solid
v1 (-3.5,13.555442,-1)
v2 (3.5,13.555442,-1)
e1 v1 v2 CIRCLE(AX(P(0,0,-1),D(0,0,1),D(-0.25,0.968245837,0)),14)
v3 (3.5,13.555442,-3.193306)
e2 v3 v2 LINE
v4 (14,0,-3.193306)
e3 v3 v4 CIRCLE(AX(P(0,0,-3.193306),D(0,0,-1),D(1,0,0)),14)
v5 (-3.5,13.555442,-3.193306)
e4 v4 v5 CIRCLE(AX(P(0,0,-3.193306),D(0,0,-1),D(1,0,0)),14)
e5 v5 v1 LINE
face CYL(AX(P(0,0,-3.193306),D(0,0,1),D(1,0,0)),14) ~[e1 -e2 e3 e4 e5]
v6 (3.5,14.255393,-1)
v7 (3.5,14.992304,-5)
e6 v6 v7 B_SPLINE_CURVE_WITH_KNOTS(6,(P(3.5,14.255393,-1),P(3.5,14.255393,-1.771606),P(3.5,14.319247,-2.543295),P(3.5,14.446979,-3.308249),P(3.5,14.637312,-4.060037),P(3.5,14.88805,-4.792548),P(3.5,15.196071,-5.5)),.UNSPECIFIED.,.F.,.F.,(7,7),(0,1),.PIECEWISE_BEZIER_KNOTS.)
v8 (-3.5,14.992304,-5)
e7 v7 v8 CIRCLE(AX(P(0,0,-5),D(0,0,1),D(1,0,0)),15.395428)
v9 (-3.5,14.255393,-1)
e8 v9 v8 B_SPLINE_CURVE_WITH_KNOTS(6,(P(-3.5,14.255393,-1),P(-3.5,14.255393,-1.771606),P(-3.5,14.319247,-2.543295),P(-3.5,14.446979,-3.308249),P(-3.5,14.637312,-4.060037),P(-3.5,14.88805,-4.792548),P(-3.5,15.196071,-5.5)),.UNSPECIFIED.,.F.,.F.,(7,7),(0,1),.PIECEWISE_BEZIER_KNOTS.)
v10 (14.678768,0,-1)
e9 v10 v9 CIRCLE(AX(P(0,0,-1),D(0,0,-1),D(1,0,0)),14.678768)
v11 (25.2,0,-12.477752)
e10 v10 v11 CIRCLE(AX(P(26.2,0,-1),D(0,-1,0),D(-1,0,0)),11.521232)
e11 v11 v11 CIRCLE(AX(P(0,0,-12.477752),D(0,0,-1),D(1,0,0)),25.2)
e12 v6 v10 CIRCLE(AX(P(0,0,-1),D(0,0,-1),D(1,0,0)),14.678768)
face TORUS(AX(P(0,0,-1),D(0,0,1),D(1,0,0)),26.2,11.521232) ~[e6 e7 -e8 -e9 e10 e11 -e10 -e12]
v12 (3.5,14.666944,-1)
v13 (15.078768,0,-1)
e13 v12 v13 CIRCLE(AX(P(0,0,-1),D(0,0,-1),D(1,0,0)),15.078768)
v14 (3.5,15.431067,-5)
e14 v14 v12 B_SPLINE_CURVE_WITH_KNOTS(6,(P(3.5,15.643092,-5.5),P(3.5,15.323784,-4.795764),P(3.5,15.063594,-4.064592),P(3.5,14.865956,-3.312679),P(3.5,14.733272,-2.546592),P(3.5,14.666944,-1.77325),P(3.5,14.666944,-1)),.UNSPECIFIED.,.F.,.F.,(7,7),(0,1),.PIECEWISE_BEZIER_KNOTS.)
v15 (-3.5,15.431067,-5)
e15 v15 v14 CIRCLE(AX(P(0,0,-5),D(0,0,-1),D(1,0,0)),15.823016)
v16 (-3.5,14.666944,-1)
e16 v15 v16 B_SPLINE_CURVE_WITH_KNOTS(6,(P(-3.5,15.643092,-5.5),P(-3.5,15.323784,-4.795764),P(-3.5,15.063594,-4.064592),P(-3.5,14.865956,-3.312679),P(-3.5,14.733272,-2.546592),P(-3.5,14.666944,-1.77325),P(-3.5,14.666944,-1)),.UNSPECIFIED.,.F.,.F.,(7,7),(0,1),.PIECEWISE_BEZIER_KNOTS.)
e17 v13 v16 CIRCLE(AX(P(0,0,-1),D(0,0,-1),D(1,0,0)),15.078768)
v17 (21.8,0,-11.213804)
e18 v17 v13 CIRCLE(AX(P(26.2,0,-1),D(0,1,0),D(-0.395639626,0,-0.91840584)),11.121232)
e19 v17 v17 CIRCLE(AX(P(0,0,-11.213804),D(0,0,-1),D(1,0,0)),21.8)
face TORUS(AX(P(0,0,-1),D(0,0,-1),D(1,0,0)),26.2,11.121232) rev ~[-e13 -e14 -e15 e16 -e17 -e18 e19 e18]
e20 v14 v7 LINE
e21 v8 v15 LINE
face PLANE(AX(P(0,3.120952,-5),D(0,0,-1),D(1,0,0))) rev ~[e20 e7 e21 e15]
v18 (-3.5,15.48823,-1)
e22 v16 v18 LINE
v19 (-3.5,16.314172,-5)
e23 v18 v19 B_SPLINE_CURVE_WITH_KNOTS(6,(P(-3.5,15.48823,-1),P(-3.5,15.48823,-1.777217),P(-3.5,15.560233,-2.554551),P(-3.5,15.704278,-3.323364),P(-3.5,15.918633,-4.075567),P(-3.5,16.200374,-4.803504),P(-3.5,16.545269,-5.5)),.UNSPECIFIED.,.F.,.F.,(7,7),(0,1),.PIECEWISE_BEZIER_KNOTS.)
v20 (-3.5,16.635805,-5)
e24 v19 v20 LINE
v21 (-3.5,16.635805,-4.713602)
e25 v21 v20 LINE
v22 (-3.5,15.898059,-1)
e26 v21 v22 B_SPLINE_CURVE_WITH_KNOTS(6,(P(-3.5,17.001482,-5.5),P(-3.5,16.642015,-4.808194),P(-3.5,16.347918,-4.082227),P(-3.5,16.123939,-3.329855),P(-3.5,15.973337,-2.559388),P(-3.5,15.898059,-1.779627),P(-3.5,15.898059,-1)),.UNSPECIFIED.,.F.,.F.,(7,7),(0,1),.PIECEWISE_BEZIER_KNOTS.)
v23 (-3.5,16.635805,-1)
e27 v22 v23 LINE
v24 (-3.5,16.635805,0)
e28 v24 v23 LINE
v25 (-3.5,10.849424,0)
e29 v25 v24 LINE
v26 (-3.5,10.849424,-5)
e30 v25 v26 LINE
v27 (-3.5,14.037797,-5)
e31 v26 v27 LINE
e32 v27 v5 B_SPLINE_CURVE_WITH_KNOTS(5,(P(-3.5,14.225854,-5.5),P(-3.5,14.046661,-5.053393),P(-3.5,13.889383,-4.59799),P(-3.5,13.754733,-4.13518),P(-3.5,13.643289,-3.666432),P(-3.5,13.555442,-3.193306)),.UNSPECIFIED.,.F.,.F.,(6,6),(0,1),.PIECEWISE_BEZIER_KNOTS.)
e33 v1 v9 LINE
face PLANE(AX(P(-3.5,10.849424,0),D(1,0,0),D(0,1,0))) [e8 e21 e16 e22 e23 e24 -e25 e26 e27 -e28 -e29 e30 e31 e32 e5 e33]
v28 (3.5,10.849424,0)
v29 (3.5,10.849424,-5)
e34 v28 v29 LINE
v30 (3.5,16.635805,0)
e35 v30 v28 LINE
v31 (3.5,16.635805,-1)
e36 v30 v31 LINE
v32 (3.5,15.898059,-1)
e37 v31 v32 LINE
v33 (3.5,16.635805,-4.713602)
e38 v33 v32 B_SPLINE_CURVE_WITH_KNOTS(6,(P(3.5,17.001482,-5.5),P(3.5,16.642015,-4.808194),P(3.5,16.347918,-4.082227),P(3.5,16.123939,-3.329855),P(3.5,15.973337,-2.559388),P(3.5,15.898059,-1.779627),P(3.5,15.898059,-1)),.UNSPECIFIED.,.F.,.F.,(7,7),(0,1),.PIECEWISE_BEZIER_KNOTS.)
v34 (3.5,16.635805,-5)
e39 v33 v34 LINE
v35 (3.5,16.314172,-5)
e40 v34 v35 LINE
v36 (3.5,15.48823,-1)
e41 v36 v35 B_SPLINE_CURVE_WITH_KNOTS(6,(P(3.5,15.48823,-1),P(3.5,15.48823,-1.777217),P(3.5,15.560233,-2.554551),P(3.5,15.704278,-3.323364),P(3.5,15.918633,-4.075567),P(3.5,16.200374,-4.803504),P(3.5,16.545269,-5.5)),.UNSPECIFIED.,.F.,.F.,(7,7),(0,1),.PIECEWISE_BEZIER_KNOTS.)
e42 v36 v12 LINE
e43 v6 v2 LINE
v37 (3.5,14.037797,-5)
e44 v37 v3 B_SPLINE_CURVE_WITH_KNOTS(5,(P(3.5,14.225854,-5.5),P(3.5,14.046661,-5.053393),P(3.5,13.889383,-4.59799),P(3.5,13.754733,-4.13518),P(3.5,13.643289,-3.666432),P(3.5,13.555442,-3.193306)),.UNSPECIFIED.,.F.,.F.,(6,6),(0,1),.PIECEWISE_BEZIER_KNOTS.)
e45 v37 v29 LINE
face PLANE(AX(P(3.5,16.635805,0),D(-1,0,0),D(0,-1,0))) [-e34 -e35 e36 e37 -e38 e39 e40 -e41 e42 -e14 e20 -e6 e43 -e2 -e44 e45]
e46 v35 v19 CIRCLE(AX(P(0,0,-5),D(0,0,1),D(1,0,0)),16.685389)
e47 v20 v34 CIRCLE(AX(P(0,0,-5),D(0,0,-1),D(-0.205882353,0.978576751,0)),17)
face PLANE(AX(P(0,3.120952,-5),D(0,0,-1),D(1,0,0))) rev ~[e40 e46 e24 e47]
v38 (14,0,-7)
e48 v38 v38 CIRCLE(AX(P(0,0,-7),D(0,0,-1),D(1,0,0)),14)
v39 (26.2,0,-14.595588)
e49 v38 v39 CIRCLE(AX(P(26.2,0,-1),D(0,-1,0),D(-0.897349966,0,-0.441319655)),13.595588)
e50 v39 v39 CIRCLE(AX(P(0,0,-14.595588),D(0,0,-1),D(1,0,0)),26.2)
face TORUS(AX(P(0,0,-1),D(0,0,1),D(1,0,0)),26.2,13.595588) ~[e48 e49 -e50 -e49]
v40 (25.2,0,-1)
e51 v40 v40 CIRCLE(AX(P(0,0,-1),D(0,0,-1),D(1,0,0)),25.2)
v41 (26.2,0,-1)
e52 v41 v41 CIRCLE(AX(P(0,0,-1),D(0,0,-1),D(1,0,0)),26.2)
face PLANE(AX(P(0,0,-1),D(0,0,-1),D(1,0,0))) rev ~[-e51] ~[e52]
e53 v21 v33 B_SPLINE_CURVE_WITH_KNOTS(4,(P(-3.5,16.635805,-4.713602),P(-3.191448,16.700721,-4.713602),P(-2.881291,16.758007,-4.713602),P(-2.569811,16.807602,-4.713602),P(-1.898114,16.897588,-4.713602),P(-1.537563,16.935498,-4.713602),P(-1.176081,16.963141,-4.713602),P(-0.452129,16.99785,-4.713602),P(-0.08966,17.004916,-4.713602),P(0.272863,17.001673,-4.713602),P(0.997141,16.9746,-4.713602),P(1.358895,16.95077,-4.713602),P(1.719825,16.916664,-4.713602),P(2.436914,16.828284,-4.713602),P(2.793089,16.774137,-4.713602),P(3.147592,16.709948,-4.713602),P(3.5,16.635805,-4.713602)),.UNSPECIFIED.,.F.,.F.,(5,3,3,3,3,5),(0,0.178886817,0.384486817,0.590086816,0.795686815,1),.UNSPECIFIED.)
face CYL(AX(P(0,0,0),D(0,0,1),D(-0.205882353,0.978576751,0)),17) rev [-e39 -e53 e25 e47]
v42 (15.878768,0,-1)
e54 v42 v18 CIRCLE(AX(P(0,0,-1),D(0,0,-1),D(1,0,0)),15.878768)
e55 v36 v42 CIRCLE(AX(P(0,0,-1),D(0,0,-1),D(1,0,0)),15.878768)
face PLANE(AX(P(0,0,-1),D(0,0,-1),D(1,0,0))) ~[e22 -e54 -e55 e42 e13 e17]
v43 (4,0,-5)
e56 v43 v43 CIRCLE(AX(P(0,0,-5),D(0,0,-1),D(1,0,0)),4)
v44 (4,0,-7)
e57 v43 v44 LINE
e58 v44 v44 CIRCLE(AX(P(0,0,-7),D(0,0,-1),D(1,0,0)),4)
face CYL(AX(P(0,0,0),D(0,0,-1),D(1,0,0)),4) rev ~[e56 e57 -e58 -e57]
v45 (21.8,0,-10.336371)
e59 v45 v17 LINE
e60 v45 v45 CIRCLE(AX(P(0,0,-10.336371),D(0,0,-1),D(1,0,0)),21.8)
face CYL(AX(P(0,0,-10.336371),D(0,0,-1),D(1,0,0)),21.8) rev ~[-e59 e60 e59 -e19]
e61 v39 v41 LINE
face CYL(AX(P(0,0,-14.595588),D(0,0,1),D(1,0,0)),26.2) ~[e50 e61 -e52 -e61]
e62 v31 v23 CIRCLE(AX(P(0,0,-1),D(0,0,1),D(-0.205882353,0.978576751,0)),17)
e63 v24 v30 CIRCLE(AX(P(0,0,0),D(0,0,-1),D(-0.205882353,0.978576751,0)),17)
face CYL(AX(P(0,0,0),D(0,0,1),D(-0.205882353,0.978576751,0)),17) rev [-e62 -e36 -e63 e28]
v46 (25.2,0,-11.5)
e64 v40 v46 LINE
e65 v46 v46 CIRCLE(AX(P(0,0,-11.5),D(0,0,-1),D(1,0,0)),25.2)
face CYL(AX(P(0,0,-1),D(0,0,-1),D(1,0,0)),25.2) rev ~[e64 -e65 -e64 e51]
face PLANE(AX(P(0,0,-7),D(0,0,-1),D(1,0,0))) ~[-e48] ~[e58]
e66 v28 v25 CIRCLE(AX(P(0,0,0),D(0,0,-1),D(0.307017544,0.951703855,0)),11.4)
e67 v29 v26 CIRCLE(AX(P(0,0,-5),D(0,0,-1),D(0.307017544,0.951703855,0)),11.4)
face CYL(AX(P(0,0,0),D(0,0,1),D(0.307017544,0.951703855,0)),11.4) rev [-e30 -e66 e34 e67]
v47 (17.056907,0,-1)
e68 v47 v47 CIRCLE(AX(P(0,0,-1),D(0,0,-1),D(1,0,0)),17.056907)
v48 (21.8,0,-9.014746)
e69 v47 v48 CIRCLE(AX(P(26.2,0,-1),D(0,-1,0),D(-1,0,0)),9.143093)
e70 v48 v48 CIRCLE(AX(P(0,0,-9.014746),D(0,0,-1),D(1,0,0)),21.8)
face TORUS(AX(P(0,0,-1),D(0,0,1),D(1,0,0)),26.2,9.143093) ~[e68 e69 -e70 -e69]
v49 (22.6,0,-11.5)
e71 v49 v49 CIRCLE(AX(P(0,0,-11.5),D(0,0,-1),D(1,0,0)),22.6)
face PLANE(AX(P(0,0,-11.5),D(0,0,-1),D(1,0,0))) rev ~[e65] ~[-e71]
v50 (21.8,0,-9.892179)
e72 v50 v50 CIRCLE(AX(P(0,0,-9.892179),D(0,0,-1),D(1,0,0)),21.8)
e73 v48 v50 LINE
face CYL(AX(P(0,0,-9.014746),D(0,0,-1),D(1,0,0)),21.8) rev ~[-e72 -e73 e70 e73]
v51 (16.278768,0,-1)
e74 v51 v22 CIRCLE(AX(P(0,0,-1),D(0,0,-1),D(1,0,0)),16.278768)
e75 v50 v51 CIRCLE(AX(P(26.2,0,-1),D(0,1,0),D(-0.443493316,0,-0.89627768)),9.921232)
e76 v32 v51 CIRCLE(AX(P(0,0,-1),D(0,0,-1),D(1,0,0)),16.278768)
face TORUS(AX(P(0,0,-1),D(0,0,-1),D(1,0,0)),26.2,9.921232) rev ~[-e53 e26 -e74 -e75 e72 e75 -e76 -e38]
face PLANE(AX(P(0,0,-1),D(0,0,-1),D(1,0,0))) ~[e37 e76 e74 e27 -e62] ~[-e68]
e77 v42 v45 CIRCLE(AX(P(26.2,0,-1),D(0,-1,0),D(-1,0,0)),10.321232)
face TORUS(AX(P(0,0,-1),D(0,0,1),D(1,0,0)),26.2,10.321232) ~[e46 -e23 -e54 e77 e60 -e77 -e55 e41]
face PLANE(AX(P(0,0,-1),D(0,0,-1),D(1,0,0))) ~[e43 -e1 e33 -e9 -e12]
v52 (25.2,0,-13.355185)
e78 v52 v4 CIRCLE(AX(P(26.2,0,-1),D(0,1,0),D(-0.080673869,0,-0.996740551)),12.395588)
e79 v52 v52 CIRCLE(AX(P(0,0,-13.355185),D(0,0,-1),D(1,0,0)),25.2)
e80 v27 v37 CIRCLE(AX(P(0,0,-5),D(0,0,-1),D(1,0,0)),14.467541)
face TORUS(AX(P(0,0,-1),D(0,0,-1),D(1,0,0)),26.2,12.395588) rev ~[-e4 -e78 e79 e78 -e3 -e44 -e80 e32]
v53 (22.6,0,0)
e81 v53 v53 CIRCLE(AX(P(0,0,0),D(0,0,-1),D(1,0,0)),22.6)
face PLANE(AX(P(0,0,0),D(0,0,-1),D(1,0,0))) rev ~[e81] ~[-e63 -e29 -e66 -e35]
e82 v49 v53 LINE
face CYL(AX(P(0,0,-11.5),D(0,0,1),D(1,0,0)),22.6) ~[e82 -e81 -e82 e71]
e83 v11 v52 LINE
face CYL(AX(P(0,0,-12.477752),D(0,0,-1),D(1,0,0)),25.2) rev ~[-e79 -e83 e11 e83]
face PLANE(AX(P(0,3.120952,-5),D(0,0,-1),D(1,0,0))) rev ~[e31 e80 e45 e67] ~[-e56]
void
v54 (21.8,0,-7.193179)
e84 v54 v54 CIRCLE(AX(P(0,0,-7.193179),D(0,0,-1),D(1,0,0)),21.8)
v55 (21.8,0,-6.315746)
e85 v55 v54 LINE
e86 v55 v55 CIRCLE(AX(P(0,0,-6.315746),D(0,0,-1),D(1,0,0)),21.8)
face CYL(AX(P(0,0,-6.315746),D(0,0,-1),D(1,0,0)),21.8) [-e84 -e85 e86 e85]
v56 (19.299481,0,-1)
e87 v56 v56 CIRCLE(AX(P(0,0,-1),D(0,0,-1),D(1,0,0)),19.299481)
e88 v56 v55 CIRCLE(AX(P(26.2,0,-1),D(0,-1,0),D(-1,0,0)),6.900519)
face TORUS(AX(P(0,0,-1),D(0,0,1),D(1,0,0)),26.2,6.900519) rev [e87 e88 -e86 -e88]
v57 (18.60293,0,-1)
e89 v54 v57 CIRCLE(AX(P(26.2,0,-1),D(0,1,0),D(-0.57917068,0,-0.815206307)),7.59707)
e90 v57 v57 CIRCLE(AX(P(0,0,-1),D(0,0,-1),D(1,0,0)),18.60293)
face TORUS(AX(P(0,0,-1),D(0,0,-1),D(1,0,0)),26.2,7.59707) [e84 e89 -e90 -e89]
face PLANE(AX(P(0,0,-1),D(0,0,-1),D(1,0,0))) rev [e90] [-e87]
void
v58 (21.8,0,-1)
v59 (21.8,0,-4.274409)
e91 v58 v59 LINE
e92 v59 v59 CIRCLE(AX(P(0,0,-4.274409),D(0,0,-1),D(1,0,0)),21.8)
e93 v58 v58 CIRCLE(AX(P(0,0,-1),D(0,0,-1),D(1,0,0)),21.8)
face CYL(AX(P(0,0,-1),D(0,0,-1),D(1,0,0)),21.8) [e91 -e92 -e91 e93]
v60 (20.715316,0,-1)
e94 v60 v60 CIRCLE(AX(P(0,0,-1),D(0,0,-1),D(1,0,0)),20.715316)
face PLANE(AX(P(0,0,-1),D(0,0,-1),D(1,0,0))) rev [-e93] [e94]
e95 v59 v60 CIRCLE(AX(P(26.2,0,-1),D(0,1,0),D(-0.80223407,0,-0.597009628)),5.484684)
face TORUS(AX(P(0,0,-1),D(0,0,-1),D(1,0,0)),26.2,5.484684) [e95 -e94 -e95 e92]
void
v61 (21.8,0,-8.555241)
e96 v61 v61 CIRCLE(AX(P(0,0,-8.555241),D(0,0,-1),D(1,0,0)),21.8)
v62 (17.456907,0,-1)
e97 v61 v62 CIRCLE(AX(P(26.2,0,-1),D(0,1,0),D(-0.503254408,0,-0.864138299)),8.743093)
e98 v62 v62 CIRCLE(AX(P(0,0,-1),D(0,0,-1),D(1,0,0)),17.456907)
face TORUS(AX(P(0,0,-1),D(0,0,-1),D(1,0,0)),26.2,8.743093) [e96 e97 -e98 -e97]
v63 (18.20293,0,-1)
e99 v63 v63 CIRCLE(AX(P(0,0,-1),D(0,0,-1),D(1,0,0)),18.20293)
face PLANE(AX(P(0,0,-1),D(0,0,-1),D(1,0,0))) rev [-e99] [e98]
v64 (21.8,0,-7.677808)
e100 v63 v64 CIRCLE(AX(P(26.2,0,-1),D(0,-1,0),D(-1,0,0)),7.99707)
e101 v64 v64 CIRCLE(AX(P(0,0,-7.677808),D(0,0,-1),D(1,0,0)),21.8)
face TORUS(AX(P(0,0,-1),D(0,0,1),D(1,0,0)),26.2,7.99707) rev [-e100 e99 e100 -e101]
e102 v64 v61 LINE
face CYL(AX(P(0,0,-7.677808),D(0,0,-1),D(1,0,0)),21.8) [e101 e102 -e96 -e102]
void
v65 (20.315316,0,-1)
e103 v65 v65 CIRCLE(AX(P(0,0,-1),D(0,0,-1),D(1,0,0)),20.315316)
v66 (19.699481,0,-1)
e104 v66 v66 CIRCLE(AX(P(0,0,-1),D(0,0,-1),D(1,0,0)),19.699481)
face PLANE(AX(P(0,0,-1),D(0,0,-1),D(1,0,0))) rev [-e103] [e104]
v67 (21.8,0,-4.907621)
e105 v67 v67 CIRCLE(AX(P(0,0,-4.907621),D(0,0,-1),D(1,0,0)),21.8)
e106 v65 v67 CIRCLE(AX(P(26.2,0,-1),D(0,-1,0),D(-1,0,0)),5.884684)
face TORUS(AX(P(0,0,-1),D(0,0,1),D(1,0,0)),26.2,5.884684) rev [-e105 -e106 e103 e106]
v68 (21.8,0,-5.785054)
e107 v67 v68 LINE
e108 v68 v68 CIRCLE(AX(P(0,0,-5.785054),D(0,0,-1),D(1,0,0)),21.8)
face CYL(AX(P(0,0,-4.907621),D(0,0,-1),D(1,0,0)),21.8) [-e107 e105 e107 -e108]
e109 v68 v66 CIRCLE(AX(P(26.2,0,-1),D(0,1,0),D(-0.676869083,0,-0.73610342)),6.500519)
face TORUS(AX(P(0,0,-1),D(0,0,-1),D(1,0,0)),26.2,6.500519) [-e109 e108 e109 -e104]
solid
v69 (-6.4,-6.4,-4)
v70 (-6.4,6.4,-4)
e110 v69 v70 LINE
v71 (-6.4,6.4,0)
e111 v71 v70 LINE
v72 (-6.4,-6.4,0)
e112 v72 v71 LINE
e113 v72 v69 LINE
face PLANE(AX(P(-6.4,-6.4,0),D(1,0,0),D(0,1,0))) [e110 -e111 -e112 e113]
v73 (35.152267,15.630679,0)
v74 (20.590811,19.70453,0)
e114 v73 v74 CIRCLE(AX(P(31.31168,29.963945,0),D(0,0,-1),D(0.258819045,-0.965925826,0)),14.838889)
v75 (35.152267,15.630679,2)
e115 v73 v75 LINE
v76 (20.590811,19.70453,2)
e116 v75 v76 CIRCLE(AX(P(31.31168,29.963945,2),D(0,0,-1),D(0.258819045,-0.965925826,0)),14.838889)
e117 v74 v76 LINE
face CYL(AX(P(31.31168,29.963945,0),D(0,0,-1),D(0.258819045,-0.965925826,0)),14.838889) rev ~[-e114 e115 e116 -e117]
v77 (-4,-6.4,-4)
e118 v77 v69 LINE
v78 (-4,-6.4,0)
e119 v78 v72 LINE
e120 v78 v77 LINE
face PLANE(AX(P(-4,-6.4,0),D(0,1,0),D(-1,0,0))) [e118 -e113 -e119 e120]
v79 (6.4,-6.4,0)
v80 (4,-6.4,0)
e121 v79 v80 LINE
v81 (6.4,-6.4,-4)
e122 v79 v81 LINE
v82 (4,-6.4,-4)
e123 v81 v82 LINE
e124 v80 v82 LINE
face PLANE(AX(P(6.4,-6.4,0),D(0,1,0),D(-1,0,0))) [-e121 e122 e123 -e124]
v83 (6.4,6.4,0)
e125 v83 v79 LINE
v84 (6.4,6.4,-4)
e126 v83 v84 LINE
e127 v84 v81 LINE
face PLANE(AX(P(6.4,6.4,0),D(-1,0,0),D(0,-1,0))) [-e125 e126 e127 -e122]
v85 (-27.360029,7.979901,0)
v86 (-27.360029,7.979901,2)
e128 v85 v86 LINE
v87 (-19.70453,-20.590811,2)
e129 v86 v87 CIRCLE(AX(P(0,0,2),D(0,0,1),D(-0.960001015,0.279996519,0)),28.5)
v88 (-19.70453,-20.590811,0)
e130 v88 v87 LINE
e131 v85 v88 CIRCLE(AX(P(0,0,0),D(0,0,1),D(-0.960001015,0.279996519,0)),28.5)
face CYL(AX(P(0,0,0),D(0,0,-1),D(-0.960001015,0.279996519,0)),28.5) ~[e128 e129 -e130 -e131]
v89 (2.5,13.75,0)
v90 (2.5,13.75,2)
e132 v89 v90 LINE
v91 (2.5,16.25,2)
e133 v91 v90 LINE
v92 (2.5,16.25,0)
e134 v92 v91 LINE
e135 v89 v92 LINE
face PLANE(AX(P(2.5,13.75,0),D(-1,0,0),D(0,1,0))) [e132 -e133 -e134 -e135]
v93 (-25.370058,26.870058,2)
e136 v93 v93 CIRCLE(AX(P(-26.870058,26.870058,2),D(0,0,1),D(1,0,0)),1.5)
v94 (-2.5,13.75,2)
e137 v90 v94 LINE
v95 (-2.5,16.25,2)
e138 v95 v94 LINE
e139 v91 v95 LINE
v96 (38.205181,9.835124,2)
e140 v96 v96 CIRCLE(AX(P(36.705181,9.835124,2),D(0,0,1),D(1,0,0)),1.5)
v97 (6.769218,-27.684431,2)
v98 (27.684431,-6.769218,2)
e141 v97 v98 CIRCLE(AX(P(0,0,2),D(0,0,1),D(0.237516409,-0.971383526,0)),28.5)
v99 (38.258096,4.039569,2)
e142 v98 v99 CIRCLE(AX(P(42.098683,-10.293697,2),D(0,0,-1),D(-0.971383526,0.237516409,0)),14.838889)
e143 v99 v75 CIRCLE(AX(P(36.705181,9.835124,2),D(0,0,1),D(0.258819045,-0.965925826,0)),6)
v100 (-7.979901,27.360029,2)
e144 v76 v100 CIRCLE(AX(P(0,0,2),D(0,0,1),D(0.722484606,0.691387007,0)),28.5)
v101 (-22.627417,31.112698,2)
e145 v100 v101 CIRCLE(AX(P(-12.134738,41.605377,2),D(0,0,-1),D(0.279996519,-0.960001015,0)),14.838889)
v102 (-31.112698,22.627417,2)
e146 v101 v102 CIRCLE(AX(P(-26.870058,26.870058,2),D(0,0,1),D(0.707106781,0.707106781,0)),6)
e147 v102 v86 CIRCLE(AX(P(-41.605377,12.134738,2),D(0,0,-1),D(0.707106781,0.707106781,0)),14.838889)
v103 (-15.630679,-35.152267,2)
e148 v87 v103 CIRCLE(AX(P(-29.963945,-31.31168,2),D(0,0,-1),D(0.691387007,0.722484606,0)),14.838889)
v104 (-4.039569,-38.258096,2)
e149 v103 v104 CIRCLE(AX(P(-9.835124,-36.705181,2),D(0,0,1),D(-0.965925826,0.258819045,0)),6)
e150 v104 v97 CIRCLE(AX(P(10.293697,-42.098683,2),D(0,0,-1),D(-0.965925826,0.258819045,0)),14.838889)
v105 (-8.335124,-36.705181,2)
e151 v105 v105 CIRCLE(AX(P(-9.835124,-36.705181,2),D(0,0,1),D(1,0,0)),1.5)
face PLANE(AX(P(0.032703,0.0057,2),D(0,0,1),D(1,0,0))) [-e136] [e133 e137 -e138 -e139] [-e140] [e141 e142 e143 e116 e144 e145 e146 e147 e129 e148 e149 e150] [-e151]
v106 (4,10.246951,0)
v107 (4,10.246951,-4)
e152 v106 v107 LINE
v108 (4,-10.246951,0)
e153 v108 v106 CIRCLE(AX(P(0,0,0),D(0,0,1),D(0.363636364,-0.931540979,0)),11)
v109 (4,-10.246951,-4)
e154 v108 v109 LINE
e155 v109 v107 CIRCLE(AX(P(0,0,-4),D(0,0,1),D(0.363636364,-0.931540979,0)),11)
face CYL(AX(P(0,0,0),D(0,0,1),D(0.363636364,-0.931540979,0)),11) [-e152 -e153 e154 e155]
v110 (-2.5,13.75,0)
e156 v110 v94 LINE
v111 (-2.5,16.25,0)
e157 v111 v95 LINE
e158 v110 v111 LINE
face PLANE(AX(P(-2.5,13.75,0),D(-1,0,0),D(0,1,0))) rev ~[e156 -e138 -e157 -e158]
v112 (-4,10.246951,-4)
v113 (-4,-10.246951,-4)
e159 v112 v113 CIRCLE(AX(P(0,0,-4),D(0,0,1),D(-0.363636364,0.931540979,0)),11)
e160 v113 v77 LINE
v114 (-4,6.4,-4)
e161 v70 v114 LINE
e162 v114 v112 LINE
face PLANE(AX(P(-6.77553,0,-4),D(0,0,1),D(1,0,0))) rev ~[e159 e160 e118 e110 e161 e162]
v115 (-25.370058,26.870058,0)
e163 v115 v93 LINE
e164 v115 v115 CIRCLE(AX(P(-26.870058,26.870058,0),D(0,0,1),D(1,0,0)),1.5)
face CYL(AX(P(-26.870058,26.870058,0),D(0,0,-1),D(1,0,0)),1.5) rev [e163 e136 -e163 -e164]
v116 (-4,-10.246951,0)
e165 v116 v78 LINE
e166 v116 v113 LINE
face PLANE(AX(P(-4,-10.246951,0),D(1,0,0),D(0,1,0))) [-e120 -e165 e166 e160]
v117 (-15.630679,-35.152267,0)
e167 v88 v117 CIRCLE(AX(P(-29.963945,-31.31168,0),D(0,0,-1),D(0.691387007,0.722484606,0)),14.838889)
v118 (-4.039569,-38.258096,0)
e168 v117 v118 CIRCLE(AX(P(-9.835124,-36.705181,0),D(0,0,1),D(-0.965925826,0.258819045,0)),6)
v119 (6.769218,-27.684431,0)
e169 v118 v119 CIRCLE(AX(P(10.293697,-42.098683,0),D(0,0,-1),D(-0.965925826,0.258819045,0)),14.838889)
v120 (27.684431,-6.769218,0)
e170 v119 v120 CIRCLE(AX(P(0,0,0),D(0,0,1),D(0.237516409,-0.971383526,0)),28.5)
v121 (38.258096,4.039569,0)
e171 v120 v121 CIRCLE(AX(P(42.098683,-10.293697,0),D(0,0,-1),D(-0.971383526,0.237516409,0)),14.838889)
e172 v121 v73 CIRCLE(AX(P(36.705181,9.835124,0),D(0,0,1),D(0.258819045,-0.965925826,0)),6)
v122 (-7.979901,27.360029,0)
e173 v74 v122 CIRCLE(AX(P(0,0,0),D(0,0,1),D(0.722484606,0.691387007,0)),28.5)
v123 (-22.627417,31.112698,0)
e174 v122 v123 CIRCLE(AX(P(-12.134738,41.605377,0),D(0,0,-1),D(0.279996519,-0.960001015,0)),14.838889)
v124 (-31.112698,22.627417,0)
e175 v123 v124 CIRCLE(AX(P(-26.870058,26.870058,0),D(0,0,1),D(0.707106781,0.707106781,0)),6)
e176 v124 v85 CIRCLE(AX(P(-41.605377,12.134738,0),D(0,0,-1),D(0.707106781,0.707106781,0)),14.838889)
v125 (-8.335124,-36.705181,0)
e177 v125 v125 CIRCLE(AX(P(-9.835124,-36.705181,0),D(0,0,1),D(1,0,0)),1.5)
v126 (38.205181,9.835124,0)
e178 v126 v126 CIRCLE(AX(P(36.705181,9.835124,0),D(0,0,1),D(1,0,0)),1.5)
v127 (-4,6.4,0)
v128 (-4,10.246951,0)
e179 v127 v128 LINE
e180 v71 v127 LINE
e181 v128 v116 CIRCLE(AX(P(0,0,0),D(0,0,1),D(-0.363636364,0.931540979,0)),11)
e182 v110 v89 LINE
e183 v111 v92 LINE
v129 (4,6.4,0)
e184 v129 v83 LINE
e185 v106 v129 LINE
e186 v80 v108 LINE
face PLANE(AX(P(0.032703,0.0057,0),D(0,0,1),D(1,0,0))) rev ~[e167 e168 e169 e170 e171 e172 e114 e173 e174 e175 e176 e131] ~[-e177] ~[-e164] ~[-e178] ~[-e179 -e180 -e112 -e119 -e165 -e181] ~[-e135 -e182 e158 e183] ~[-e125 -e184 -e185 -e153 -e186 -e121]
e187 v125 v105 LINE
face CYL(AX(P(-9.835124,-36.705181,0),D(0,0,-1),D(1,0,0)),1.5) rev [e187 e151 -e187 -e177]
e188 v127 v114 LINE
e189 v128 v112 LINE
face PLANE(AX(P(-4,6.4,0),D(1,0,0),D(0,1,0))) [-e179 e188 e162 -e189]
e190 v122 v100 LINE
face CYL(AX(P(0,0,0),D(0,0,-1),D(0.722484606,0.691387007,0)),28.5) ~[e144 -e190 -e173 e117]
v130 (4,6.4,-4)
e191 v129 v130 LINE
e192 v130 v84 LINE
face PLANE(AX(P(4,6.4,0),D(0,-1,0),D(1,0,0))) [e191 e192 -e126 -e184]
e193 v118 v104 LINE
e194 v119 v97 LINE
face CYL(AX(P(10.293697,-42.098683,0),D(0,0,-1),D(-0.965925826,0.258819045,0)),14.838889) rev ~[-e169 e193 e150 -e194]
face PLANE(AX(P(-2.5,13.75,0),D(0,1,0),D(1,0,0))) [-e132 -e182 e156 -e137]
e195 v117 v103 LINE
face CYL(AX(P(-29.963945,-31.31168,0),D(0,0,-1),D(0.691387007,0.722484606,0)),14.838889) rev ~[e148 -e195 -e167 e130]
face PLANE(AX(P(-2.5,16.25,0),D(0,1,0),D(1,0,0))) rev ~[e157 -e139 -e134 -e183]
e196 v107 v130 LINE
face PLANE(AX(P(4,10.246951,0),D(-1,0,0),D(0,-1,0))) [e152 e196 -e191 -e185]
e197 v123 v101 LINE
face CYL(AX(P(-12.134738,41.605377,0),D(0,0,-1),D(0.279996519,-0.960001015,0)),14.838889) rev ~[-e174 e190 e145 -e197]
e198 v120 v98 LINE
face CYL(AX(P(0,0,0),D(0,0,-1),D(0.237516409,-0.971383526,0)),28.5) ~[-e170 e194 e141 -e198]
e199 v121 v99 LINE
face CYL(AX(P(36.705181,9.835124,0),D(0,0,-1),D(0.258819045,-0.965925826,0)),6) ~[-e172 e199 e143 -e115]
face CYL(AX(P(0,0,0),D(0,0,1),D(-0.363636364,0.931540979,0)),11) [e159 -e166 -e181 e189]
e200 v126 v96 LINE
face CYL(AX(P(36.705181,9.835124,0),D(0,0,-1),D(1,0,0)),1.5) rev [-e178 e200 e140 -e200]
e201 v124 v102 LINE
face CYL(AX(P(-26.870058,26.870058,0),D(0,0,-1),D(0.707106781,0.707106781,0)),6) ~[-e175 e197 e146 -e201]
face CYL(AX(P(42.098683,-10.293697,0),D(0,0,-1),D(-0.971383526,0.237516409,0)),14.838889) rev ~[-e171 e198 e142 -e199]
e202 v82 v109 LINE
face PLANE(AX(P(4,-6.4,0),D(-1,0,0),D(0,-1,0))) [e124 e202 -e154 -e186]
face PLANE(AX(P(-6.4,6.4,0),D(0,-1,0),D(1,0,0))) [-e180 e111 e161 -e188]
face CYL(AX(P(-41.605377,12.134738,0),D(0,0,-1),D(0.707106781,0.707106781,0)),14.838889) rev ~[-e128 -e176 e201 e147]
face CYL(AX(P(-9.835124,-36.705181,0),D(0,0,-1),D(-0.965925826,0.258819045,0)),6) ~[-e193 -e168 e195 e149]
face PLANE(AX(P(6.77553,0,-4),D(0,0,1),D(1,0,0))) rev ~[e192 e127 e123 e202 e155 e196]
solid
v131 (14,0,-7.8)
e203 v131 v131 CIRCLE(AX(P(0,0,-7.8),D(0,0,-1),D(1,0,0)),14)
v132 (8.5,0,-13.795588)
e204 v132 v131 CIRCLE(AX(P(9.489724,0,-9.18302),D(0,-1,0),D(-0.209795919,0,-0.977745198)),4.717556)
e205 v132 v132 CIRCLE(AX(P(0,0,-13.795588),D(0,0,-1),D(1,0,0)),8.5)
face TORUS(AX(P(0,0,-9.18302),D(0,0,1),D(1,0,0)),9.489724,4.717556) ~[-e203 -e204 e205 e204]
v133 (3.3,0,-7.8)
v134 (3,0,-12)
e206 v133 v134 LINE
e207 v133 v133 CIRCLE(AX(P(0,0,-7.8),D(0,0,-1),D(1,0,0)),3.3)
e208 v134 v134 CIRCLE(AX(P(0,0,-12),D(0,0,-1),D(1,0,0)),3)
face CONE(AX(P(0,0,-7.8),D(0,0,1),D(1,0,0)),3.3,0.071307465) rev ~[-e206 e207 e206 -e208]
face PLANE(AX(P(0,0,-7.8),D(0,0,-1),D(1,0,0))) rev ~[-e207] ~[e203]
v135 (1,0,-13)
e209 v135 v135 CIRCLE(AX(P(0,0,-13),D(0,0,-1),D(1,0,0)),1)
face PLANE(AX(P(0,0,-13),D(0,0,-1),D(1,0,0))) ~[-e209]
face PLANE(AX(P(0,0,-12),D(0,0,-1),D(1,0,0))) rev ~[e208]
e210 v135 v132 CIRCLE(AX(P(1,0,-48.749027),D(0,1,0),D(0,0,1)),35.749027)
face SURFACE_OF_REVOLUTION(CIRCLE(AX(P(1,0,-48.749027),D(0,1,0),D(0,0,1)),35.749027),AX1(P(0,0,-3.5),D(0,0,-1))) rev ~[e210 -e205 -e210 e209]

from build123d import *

# Parameters (mm, degrees)
F0_R     = 1.5
F1_DEPTH = 2
F3_DEPTH = 4
F2_W     = 5
F2_H     = 2.5
F4_DEPTH = 2.001
F7_R     = 4
F8_DEPTH = 5


# Not quite as in the source:
# - a feature names something its author has since deleted; it is built from what else it names


with BuildPart() as f1:
    # F0 (on Top) → F1 (new body)
    with BuildSketch(Plane.XY):
        with BuildLine():
            ThreePointArc((27.6844305044, -6.7692176539), (28.2953730261, -3.4090857003), (28.5, 0))
            ThreePointArc((28.5, 0), (26.4488952648, 10.6163053494), (20.5908112792, 19.7045297043))
            ThreePointArc((20.5908112792, 19.7045297043), (7.3763427854, 27.5288860492), (-7.9799008001, 27.3600289331))
            ThreePointArc((-7.9799008001, 27.3600289331), (-20.1525432638, 20.1525432638), (-27.3600289331, 7.9799008001))
            ThreePointArc((-27.3600289331, 7.9799008001), (-27.5288860492, -7.3763427854), (-19.7045297043, -20.5908112792))
            ThreePointArc((-19.7045297043, -20.5908112792), (-7.3763427854, -27.5288860492), (6.7692176539, -27.6844305044))
            ThreePointArc((6.7692176539, -27.6844305044), (20.1525432638, -20.1525432638), (27.6844305044, -6.7692176539))
        make_face()
        with BuildLine():
            ThreePointArc((20.5908112792, 19.7045297043), (26.4488952648, 10.6163053494), (28.5, 0))
            ThreePointArc((28.5, 0), (28.2953730261, -3.4090857003), (27.6844305044, -6.7692176539))
            ThreePointArc((27.6844305044, -6.7692176539), (31.4912676218, 0.0829769879), (38.2580956696, 4.0395687562))
            ThreePointArc((38.2580956696, 4.0395687562), (42.5007363567, 11.3880379845), (35.1522671284, 15.6306786716))
            ThreePointArc((35.1522671284, 15.6306786716), (27.3137262518, 15.6737736314), (20.5908112792, 19.7045297043))
        make_face()
        with Locations((36.705181399, 9.8351237139)):
            Circle(F0_R, mode=Mode.SUBTRACT)
        with BuildLine():
            ThreePointArc((-27.3600289331, 7.9799008001), (-20.1525432638, 20.1525432638), (-7.9799008001, 27.3600289331))
            ThreePointArc((-7.9799008001, 27.3600289331), (-15.8174939904, 27.2307492639), (-22.627416998, 31.1126983722))
            ThreePointArc((-22.627416998, 31.1126983722), (-31.1126983722, 31.1126983722), (-31.1126983722, 22.627416998))
            ThreePointArc((-31.1126983722, 22.627416998), (-27.2307492639, 15.8174939904), (-27.3600289331, 7.9799008001))
        make_face()
        with Locations((-26.8700576851, 26.8700576851)):
            Circle(F0_R, mode=Mode.SUBTRACT)
        with BuildLine():
            ThreePointArc((-4.0395687562, -38.2580956696), (-0.0829769879, -31.4912676218), (6.7692176539, -27.6844305044))
            ThreePointArc((6.7692176539, -27.6844305044), (-7.3763427854, -27.5288860492), (-19.7045297043, -20.5908112792))
            ThreePointArc((-19.7045297043, -20.5908112792), (-15.6737736314, -27.3137262518), (-15.6306786716, -35.1522671284))
            ThreePointArc((-15.6306786716, -35.1522671284), (-11.3880379845, -42.5007363567), (-4.0395687562, -38.2580956696))
        make_face()
        with Locations((-9.8351237139, -36.705181399)):
            Circle(F0_R, mode=Mode.SUBTRACT)
    extrude(amount=F1_DEPTH)

    # F2 (on Top) → F3 (join)
    with BuildSketch(Plane.XY):
        with BuildLine():
            Line((-4, -6.4), (-6.4, -6.4))
            Line((-6.4, -6.4), (-6.4, 6.4))
            Line((-6.4, 6.4), (-4, 6.4))
            Line((-4, 6.4), (-4, 10.246950766))
            ThreePointArc((-4, 10.246950766), (-11, 0), (-4, -10.246950766))
            Line((-4, -10.246950766), (-4, -6.4))
        make_face()
        with BuildLine():
            Line((4, 6.4), (6.4, 6.4))
            Line((6.4, 6.4), (6.4, -6.4))
            Line((6.4, -6.4), (4, -6.4))
            Line((4, -6.4), (4, -10.246950766))
            ThreePointArc((4, -10.246950766), (11, 0), (4, 10.246950766))
            Line((4, 10.246950766), (4, 6.4))
        make_face()
    extrude(amount=-F3_DEPTH)

    # F2 (on Top) → F4 (cut, through all)
    with BuildSketch(Plane.XY):
        with Locations((0, 15)):
            Rectangle(F2_W, F2_H)
    extrude(amount=F4_DEPTH, mode=Mode.SUBTRACT)


with BuildPart() as f6:
    # F5 (on Front) → F6 (revolve)
    with BuildSketch(Plane.XZ):
        with BuildLine():
            Line((22.6, 0), (14, 0))
            Line((14, 0), (13.4435483002, 0))
            ThreePointArc((13.4435483002, 0), (16.8052502032, -9.687101716), (26.2, -13.7955875195))
            Line((26.2, -13.7955875195), (26.2, -11.5))
            Line((26.2, -11.5), (26.2, -1))
            Line((26.2, -1), (25.2, -1))
            Line((25.2, -1), (25.2, -11.5))
            Line((25.2, -11.5), (22.6, -11.5))
            Line((22.6, -11.5), (22.6, 0))
        make_face()
        with BuildLine():
            ThreePointArc((25.2, -13.3551847397), (17.8707775672, -10.1801222006), (14, -3.1933057136))
            Line((14, -3.1933057136), (14, -1))
            Line((14, -1), (14.6787681728, -1))
            ThreePointArc((14.6787681728, -1), (17.7070613259, -8.7851638065), (25.2, -12.4777516446))
            Line((25.2, -12.4777516446), (25.2, -13.3551847397))
        make_face(mode=Mode.SUBTRACT)
        with BuildLine():
            ThreePointArc((21.8, -11.2138042548), (16.9098111592, -7.1134432734), (15.0787681728, -1))
            Line((15.0787681728, -1), (15.8787681728, -1))
            ThreePointArc((15.8787681728, -1), (17.4838871488, -6.5278570166), (21.8, -10.3363711597))
            Line((21.8, -10.3363711597), (21.8, -11.2138042548))
        make_face(mode=Mode.SUBTRACT)
        with BuildLine():
            Line((21.8, -9.0147455451), (21.8, -9.8921786402))
            ThreePointArc((21.8, -9.8921786402), (17.7713506121, -6.2334224428), (16.2787681728, -1))
            Line((16.2787681728, -1), (17.0569071889, -1))
            ThreePointArc((17.0569071889, -1), (18.3315263703, -5.6565297048), (21.8, -9.0147455451))
        make_face(mode=Mode.SUBTRACT)
        with BuildLine():
            ThreePointArc((21.8, -8.5552413531), (18.6200501231, -5.3572963828), (17.4569071889, -1))
            Line((17.4569071889, -1), (18.202930341, -1))
            ThreePointArc((18.202930341, -1), (19.1593952806, -4.7924936804), (21.8, -7.677808258))
            Line((21.8, -7.677808258), (21.8, -8.5552413531))
        make_face(mode=Mode.SUBTRACT)
        with BuildLine():
            Line((21.8, -6.3157460081), (21.8, -7.1931791032))
            ThreePointArc((21.8, -7.1931791032), (19.4493491461, -4.4848501334), (18.602930341, -1))
            Line((18.602930341, -1), (19.2994814961, -1))
            ThreePointArc((19.2994814961, -1), (19.9558252331, -3.9372499217), (21.8, -6.3157460081))
        make_face(mode=Mode.SUBTRACT)
        with BuildLine():
            ThreePointArc((21.8, -5.7850538993), (20.2477305909, -3.6128968026), (19.6994814961, -1))
            Line((19.6994814961, -1), (20.3153164614, -1))
            ThreePointArc((20.3153164614, -1), (20.6989951864, -3.0900828667), (21.8, -4.9076208042))
            Line((21.8, -4.9076208042), (21.8, -5.7850538993))
        make_face(mode=Mode.SUBTRACT)
        with BuildLine():
            Line((21.8, -1), (21.8, -4.2744088808))
            ThreePointArc((21.8, -4.2744088808), (20.9935443396, -2.7246950381), (20.7153164614, -1))
            Line((20.7153164614, -1), (21.8, -1))
        make_face(mode=Mode.SUBTRACT)
        with BuildLine():
            ThreePointArc((26.2, -13.7955875195), (16.8052502032, -9.687101716), (13.4435483002, 0))
            Line((13.4435483002, 0), (4, 0))
            Line((4, 0), (4, -7))
            Line((4, -7), (14, -7))
            ThreePointArc((14, -7), (19.0143728568, -12.5415234072), (26.2, -14.5955875195))
            Line((26.2, -14.5955875195), (26.2, -13.7955875195))
        make_face()
    revolve(axis=Axis((0, 0, -3.5), (0, 0, -1)))

    # F7 (on face) → F8 (cut)
    with BuildSketch(Plane(origin=(0, 0, 0), x_dir=(1, 0, 0), z_dir=(0, 0, -1))):
        with BuildLine():
            ThreePointArc((3.5, -10.8494239478), (0, 11.4), (-3.5, -10.8494239478))
            Line((-3.5, -10.8494239478), (-3.5, -16.6358047596))
            ThreePointArc((-3.5, -16.6358047596), (0, -17), (3.5, -16.6358047596))
            Line((3.5, -16.6358047596), (3.5, -10.8494239478))
        make_face()
        Circle(F7_R, mode=Mode.SUBTRACT)
    extrude(amount=F8_DEPTH, mode=Mode.SUBTRACT)


with BuildPart() as f10:
    # F9 (on Front) → F10 (revolve)
    with BuildSketch(Plane.XZ):
        with BuildLine():
            Line((14, -7.8), (3.3, -7.8))
            Line((3.3, -7.8), (3, -12))
            Line((3, -12), (0, -12))
            Line((0, -12), (0, -13))
            Line((0, -13), (1, -13))
            ThreePointArc((1, -13), (4.7710396279, -13.1994532812), (8.5, -13.7955875195))
            ThreePointArc((8.5, -13.7955875195), (12.9661214102, -12.372062791), (14, -7.8))
        make_face()
    revolve(axis=Axis((0, 0, -3.5), (0, 0, -1)))


solid = Compound([f1.part, f6.part, f10.part])
